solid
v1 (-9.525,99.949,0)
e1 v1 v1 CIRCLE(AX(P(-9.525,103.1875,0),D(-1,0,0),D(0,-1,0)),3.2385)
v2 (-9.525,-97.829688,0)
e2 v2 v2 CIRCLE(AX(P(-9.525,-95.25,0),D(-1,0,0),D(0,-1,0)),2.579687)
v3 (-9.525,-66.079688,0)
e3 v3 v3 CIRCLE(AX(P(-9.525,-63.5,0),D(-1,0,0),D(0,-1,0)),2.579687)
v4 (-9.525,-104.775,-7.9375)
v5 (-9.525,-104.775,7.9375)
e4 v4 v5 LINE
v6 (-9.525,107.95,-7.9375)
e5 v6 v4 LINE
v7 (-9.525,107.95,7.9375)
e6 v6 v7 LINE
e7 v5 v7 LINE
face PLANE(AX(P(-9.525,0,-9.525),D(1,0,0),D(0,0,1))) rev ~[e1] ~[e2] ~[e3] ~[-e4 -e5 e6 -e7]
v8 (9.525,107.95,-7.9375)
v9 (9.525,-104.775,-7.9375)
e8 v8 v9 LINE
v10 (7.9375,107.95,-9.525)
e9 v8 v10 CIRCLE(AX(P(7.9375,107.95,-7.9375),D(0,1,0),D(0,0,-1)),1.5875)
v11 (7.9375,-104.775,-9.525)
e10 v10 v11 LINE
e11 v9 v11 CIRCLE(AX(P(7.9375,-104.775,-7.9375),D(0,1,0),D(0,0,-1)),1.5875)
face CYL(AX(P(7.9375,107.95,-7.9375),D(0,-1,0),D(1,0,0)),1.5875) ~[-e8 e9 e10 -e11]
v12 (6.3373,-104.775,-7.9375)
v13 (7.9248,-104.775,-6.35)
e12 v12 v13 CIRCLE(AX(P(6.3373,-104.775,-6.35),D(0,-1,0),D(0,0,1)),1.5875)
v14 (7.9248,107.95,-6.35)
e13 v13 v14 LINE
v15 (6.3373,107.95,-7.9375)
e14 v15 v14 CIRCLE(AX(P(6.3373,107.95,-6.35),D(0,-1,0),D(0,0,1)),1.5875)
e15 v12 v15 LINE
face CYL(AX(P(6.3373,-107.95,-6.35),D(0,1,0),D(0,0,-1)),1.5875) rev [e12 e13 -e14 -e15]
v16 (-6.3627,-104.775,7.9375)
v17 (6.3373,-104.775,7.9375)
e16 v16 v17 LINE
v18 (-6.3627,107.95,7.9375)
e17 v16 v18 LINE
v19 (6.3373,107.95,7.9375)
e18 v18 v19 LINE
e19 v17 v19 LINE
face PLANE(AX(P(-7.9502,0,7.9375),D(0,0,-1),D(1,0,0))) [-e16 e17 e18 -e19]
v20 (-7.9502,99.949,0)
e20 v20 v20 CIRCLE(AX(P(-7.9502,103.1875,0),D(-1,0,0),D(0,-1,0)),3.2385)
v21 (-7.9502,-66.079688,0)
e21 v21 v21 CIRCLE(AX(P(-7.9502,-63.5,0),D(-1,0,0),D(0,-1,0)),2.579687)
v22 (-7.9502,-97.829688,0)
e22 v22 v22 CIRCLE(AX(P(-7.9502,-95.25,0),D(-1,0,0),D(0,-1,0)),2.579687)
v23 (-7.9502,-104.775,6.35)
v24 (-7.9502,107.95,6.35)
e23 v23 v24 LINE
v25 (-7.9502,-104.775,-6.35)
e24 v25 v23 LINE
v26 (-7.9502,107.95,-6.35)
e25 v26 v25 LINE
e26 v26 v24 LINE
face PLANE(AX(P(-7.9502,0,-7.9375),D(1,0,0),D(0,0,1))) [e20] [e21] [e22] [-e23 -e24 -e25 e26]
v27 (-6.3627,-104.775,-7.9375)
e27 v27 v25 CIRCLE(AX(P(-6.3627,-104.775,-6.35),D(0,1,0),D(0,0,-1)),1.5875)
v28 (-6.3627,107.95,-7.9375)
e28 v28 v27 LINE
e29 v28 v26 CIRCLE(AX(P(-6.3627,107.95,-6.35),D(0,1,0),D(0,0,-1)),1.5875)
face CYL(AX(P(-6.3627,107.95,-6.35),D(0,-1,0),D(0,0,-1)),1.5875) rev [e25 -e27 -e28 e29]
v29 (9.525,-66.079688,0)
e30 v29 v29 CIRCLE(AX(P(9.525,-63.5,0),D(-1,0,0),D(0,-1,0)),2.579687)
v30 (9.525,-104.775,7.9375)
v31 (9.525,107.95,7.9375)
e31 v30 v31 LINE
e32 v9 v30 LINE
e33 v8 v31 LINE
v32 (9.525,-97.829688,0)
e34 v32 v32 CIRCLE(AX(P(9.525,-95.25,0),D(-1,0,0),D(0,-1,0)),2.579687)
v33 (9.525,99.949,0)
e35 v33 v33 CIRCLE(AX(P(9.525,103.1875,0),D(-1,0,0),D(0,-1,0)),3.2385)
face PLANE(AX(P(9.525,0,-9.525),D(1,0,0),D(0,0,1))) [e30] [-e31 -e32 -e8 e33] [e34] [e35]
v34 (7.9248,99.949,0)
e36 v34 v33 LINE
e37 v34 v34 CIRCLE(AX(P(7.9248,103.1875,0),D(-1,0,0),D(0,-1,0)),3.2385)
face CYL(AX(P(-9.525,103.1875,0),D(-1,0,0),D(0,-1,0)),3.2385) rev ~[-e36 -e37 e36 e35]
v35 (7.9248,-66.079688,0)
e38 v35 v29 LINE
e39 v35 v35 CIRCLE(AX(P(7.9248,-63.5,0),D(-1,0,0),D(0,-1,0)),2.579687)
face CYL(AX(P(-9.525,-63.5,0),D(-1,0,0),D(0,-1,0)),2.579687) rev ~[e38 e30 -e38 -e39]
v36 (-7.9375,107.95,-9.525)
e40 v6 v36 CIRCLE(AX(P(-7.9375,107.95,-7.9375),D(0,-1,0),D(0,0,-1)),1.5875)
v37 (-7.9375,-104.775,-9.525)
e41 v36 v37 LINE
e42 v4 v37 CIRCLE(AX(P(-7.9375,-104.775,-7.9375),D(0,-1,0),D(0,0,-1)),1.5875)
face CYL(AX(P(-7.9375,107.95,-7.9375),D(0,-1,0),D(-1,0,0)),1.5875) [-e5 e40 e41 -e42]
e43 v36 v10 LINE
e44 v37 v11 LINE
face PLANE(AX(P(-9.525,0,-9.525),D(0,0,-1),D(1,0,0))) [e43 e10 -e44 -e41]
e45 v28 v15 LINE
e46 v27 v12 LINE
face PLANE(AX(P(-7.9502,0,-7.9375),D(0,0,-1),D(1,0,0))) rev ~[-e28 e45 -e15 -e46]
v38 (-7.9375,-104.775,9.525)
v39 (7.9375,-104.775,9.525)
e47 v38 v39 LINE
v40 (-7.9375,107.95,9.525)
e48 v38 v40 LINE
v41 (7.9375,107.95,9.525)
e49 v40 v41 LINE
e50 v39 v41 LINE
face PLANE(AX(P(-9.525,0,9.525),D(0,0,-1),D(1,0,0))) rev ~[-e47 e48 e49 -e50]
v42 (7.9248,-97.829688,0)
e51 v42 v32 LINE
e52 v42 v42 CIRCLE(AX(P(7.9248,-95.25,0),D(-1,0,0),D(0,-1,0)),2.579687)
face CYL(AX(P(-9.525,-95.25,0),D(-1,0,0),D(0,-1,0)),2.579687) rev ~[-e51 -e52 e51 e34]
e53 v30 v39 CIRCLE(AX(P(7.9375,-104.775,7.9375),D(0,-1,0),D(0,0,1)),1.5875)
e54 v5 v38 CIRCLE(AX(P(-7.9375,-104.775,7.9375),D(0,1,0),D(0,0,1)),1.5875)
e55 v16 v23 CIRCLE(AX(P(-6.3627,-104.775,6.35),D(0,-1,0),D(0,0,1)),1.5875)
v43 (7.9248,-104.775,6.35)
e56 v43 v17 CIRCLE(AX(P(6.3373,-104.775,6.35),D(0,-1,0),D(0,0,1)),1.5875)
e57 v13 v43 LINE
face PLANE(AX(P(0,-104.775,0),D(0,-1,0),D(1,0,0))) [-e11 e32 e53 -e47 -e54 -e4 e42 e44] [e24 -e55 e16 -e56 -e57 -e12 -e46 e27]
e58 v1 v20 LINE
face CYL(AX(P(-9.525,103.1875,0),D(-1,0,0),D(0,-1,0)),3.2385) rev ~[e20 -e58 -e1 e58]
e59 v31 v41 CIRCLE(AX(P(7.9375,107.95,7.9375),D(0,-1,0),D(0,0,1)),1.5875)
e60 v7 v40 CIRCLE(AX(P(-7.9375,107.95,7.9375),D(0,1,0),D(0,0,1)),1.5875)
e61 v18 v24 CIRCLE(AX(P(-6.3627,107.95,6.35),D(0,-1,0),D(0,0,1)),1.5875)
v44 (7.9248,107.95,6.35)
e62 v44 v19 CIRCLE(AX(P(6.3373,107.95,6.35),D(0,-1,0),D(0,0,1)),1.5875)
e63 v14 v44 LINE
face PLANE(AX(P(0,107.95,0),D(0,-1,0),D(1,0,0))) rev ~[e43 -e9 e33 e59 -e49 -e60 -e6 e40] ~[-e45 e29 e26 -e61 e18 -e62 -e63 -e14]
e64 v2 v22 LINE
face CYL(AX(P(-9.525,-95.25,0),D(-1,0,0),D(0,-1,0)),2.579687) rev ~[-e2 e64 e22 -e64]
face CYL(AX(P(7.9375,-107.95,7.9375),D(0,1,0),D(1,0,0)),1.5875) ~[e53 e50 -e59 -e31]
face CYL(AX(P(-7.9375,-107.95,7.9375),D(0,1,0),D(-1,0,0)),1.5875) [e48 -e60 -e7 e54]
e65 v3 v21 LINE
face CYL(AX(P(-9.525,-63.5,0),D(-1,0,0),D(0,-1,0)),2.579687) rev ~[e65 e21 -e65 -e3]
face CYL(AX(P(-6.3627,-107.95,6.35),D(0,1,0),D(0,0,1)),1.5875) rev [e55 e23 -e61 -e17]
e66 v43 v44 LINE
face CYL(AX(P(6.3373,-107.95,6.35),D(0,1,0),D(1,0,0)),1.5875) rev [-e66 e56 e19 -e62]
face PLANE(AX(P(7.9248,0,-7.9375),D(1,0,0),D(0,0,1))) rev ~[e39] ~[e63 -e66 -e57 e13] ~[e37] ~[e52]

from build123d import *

# Parameters (mm, degrees)
F0_W     = 19.05
F0_H     = 19.05
F0_W_2   = 15.875
F0_H_2   = 15.875
F1_DEPTH = 107.95
F2_R     = 1.5875
F3_R     = 1.5875
F4_R     = 3.2385
F4_R_2   = 2.5796875
F5_DEPTH = 19.05
F6_DEPTH = 3.175


# Not quite as in the source:
# - a length typed as a fraction of an inch, garbled in the dataset ("3 / 203.2 mm" for 3/8 in), is restored


with BuildPart() as f1:
    # F0 (on Front) → F1 (new body, symmetric)
    with BuildSketch(Plane.XZ):
        Rectangle(F0_W, F0_H)
        with Locations((-0.0127, 0)):
            Rectangle(F0_W_2, F0_H_2, mode=Mode.SUBTRACT)
    extrude(amount=F1_DEPTH, both=True)

    # F2
    f2_edges = [f1.edges().sort_by_distance(p)[0] for p in [
        (-9.525, 0, 9.525),
        (-9.525, 0, -9.525),
        (9.525, 0, -9.525),
        (9.525, 0, 9.525),
    ]]
    fillet(f2_edges, radius=F2_R)

    # F3
    f3_edges = [f1.edges().sort_by_distance(p)[0] for p in [
        (-7.9502, 0, 7.9375),
        (-7.9502, 0, -7.9375),
        (7.9248, 0, 7.9375),
        (7.9248, 0, -7.9375),
    ]]
    fillet(f3_edges, radius=F3_R)

    # F4 (on face) → F5 (cut)
    with BuildSketch(Plane(origin=(-9.525, 0, 0), x_dir=(0, -1, 0), z_dir=(-1, 0, 0))):
        with Locations((-103.1875, 0)):
            Circle(F4_R)
        with Locations((63.5, 0)):
            Circle(F4_R_2)
        with Locations((95.25, 0)):
            Circle(F4_R_2)
    extrude(amount=-F5_DEPTH, mode=Mode.SUBTRACT)

    # F6 (cut): a face of the model
    f6_faces = [f1.faces().sort_by_distance(p)[0] for p in [
        (-8.2196076836, -107.95, 0),
    ]]
    extrude(f6_faces, amount=-F6_DEPTH, mode=Mode.SUBTRACT)


solid = f1.part
